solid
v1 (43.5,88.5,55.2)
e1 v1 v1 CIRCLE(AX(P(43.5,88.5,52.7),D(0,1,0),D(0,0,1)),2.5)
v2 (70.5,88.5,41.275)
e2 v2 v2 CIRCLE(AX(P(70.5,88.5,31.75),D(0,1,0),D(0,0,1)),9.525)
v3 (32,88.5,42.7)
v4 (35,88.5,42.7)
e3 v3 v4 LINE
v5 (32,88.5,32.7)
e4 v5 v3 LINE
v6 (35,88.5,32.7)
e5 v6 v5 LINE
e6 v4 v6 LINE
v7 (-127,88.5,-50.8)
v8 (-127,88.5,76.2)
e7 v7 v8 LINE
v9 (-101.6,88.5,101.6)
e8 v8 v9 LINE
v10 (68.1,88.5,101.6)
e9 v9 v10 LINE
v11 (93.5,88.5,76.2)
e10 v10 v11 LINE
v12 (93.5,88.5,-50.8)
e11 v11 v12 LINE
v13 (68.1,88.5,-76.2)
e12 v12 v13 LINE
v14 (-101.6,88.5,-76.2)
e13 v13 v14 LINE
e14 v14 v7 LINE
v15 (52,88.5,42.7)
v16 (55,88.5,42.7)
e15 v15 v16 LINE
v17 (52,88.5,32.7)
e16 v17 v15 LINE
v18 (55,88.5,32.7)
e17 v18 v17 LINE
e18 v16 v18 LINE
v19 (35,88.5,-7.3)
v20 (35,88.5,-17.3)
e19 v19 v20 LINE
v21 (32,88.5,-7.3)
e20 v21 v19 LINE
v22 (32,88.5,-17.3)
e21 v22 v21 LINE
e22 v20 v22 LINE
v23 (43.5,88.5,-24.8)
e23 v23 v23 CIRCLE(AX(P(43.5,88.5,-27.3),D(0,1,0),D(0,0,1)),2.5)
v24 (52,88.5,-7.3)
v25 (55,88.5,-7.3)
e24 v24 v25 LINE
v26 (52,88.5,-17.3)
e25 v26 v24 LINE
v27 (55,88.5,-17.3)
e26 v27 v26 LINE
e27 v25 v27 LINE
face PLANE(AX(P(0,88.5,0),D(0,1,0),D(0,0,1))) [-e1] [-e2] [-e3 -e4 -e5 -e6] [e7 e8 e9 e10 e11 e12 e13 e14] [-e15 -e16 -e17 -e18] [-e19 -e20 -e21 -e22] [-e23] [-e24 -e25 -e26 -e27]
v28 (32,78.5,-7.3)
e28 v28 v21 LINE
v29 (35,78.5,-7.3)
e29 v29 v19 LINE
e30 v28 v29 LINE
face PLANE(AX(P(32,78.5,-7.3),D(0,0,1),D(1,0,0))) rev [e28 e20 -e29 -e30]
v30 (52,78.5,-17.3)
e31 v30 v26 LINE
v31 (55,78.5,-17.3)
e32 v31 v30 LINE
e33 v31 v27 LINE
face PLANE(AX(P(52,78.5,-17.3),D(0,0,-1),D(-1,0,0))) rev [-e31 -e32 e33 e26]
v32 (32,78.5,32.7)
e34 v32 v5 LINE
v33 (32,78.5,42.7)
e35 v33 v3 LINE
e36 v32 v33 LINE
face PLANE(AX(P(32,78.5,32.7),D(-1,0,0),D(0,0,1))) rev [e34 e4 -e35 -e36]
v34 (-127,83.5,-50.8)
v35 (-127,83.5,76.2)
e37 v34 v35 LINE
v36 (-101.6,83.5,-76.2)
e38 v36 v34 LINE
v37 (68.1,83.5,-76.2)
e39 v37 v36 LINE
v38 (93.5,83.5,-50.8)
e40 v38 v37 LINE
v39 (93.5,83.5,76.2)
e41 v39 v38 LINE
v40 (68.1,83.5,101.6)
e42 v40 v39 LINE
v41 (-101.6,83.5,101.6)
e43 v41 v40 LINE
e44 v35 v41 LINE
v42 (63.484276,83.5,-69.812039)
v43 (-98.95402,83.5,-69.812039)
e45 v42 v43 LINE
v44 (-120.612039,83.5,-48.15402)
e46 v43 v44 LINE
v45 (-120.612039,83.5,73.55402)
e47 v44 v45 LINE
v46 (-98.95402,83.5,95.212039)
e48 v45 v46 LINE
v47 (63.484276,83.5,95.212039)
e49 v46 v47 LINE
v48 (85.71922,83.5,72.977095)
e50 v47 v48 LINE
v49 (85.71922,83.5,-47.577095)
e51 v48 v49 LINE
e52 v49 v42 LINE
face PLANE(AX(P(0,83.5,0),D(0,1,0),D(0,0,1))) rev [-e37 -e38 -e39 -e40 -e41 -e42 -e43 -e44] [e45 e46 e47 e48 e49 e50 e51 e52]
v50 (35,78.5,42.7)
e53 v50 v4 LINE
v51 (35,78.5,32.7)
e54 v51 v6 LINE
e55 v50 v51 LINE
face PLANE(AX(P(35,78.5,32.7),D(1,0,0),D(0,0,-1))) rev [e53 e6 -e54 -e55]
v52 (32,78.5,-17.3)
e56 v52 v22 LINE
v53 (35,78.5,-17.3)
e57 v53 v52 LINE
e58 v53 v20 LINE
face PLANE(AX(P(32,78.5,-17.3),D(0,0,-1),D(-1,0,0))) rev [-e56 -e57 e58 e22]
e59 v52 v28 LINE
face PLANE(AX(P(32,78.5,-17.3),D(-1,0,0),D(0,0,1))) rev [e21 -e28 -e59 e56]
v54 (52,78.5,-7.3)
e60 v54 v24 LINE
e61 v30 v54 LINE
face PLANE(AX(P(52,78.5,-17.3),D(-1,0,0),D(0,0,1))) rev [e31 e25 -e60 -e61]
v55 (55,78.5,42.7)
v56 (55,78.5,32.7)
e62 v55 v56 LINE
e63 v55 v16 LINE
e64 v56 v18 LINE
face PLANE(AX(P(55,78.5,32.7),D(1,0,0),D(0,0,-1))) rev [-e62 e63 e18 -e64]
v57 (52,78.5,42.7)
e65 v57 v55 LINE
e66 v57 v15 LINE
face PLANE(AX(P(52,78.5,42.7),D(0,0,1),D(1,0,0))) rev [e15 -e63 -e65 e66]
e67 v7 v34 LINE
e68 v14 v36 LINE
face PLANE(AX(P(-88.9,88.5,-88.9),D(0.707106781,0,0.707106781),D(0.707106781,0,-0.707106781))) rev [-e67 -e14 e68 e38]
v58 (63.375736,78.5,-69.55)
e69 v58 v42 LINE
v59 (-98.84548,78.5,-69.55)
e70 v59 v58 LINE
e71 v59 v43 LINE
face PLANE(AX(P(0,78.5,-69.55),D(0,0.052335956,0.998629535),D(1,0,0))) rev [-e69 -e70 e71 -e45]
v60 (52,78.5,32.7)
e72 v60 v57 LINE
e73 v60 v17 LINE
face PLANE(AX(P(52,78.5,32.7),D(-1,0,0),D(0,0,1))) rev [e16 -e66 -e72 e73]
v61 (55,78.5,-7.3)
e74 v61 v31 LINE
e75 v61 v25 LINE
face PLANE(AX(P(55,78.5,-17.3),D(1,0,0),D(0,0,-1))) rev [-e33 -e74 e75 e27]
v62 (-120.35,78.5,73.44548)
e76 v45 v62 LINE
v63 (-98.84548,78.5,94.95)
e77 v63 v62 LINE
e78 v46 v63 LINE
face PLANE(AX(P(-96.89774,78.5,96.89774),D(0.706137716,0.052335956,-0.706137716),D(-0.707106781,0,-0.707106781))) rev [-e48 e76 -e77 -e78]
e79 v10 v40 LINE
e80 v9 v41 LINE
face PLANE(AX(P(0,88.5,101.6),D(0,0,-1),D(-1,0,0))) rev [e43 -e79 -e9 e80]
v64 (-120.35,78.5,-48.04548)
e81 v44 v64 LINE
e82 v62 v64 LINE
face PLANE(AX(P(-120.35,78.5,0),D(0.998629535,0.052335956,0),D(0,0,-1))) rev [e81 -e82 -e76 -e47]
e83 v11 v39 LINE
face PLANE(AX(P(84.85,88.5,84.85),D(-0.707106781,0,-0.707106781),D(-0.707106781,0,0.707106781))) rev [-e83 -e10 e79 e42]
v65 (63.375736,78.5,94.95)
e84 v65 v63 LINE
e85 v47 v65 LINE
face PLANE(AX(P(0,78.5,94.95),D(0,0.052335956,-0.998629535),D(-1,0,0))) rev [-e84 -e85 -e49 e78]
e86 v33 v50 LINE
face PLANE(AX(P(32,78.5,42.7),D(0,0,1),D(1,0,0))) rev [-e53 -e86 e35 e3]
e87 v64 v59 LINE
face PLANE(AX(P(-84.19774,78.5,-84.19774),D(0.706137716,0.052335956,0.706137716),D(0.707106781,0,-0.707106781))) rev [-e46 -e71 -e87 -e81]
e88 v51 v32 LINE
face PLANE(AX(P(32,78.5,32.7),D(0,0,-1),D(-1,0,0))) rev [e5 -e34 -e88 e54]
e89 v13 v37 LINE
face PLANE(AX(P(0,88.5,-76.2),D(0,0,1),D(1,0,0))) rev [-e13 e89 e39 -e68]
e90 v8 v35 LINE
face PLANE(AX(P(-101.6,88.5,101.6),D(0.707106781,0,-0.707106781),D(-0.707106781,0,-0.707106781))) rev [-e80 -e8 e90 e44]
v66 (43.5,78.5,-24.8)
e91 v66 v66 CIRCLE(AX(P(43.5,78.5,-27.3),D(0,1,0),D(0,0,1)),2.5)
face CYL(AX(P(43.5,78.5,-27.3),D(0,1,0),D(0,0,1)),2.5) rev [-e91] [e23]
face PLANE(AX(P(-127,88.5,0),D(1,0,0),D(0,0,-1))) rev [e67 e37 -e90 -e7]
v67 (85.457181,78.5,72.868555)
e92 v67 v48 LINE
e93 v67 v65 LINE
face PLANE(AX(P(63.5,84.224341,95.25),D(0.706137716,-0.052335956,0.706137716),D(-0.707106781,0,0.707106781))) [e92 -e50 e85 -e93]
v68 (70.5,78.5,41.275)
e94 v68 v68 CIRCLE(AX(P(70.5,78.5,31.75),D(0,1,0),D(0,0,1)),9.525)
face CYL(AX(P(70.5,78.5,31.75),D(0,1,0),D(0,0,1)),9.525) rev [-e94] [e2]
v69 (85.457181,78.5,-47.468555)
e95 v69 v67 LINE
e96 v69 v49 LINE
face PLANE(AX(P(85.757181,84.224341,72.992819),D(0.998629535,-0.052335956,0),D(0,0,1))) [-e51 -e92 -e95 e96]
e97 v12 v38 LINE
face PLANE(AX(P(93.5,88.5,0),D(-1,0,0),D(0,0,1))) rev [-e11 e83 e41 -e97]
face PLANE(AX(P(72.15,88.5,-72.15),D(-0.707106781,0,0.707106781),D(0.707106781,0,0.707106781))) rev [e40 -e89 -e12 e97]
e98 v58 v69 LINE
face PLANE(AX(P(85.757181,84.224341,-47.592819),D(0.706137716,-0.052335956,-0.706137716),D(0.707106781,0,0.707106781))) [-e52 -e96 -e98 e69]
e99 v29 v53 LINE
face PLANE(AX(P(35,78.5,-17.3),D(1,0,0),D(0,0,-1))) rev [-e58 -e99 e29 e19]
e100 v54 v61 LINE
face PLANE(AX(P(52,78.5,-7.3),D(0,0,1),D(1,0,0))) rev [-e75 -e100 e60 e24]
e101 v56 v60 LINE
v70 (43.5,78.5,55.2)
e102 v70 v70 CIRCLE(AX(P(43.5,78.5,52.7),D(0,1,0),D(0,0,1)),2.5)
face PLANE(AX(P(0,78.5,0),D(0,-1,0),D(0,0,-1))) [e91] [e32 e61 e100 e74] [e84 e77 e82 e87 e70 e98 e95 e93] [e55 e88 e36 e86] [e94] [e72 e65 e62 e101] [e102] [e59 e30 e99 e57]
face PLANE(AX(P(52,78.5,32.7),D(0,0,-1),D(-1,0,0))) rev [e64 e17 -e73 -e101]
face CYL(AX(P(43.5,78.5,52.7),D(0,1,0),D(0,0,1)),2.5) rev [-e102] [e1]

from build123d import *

# Parameters (mm, degrees)
SKETCH2_W               = 190.5
SKETCH2_H               = 177.8
BOSS_EXTRUDE1_DEPTH     = 5.08
CHAMFER1_SIZE           = 25.4
BOSS_EXTRUDE3_DEPTH     = 68.42
SKETCH5_R               = 9
SKETCH5_R_2             = 1.5
CUT_EXTRUDE1_DEPTH      = 231.530019737
SKETCH10_W              = 177.8
SKETCH10_H              = 73.5
BOSS_EXTRUDE6_DEPTH     = 30
CHAMFER3_SIZE           = 25.4
CUT_EXTRUDE2_DEPTH      = 68.42
BOSS_EXTRUDE7_START     = 38.1
BOSS_EXTRUDE7_DEPTH     = 10
SKETCH13_W              = 15.24
SKETCH13_H              = 10
BOSS_EXTRUDE8_DEPTH     = 7
SKETCH14_R              = 2.5
CUT_EXTRUDE3_DEPTH      = 10
MIRROR4_COPY_1_SKETCH_W = 15.24
MIRROR4_COPY_1_SKETCH_H = 10
MIRROR4_COPY_1_DEPTH    = 7
MIRROR4_COPY_2_SKETCH_R = 2.5
MIRROR4_COPY_2_DEPTH    = 10
BOSS_EXTRUDE9_START     = 5
BOSS_EXTRUDE9_DEPTH     = 5
BOSS_EXTRUDE10_START    = 10
BOSS_EXTRUDE10_DEPTH    = 5
SKETCH16_R              = 2.5
CUT_EXTRUDE4_DEPTH      = 163.946494286
SKETCH17_W              = 3
SKETCH17_H              = 10
CUT_EXTRUDE5_DEPTH      = 163.946494286
BOSS_EXTRUDE11_START    = 10
SKETCH18_W              = 3
SKETCH18_H              = 10
BOSS_EXTRUDE11_DEPTH    = 10
BOSS_EXTRUDE11_2_DEPTH  = 10
BOSS_EXTRUDE11_3_DEPTH  = 10
BOSS_EXTRUDE11_4_DEPTH  = 10
SKETCH19_W              = 23
SKETCH19_H              = 60
BOSS_EXTRUDE12_DEPTH    = 20
CHAMFER5_SIZE           = 5.724341006
CHAMFER5_SIZE_2         = 0.3
BOSS_EXTRUDE13_START    = -20
SKETCH20_R              = 2.5
BOSS_EXTRUDE13_DEPTH    = 4
SKETCH21_R              = 9.525
CUT_EXTRUDE6_DEPTH      = 10


with BuildPart() as part:
    # Sketch2 → Boss-Extrude1 (new body)
    with BuildSketch(Plane(origin=(0, 0, 0), x_dir=(1, 0, 0), z_dir=(0, 1, 0))):
        with Locations((-31.75, -12.7)):
            Rectangle(SKETCH2_W, SKETCH2_H)
    extrude(amount=BOSS_EXTRUDE1_DEPTH)

    # Chamfer1
    chamfer1_edges = [part.edges().sort_by_distance(p)[0] for p in [
        (-127, 2.54, -76.2),
        (-127, 2.54, 101.6),
    ]]
    chamfer(chamfer1_edges, length=CHAMFER1_SIZE)

    # Sketch4 → Boss-Extrude3 (add)
    with BuildSketch(Plane(origin=(0, 5.08, 0), x_dir=(1, 0, 0), z_dir=(0, 1, 0))):
        Polygon((57.15, 69.85), (-98.969743879, 69.85), (-120.65, 48.169743879), (-120.65, -73.569743879), (-98.969743879, -95.25), (57.15, -95.25), (63.5, -95.25), (63.5, -101.6), (-101.6, -101.6), (-127, -76.2), (-127, 50.8), (-101.6, 76.2), (63.5, 76.2), (63.5, 69.85), align=None)
    extrude(amount=BOSS_EXTRUDE3_DEPTH)

    # Sketch5 → Cut-Extrude1 (cut, through all)
    with BuildSketch(Plane.XY.offset(101.6)):
        with Locations((-50.8, 31.75)):
            Circle(SKETCH5_R)
        with Locations((-50.8, 47.25)):
            Circle(SKETCH5_R_2)
        with Locations((-37.376606241, 39.5)):
            Circle(SKETCH5_R_2)
        with Locations((-37.376606241, 24)):
            Circle(SKETCH5_R_2)
        with Locations((-50.8, 16.25)):
            Circle(SKETCH5_R_2)
        with Locations((-64.223393759, 24)):
            Circle(SKETCH5_R_2)
        with Locations((-64.223393759, 39.5)):
            Circle(SKETCH5_R_2)
    extrude(amount=-CUT_EXTRUDE1_DEPTH, mode=Mode.SUBTRACT)

    # Sketch10 → Boss-Extrude6 (add)
    with BuildSketch(Plane(origin=(63.5, 0, 0), x_dir=(0, 0, -1), z_dir=(1, 0, 0))):
        with Locations((-12.7, 36.75)):
            Rectangle(SKETCH10_W, SKETCH10_H)
    extrude(amount=BOSS_EXTRUDE6_DEPTH)

    # Chamfer3
    chamfer3_edges = [part.edges().sort_by_distance(p)[0] for p in [
        (93.5, 36.75, 101.6),
        (93.5, 36.75, -76.2),
    ]]
    chamfer(chamfer3_edges, length=CHAMFER3_SIZE)

    # Sketch11 → Cut-Extrude2 (cut)
    with BuildSketch(Plane(origin=(0, 73.5, 0), x_dir=(1, 0, 0), z_dir=(0, 1, 0))):
        Polygon((85.757180746, -72.992819254), (85.757180746, 47.592819254), (63.5, 69.85), (63.5, -95.25), align=None)
    extrude(amount=-CUT_EXTRUDE2_DEPTH, mode=Mode.SUBTRACT)

    # Sketch12 → Boss-Extrude7 (add)
    with BuildSketch(Plane(origin=(0, 0, 95.25), x_dir=(-1, 0, 0), z_dir=(0, 0, -1)).offset(BOSS_EXTRUDE7_START)):
        with BuildLine():
            Line((25.8, 5.08), (75.8, 5.08))
            Line((75.8, 5.08), (75.8, 31.75))
            Line((75.8, 31.75), (69.8, 31.75))
            ThreePointArc((69.8, 31.75), (50.8, 12.75), (31.8, 31.75))
            Line((31.8, 31.75), (25.8, 31.75))
            Line((25.8, 31.75), (25.8, 5.08))
        make_face()
    boss_extrude7 = extrude(amount=BOSS_EXTRUDE7_DEPTH)

    # Sketch13 → Boss-Extrude8 (add)
    with BuildSketch(Plane(origin=(0, 31.75, 0), x_dir=(1, 0, 0), z_dir=(0, 1, 0))):
        with Locations((-24.18, -52.15)):
            Rectangle(SKETCH13_W, SKETCH13_H)
    boss_extrude8 = extrude(amount=-BOSS_EXTRUDE8_DEPTH)

    # Sketch14 → Cut-Extrude3 (cut)
    with BuildSketch(Plane(origin=(0, 31.75, 0), x_dir=(1, 0, 0), z_dir=(0, 1, 0))):
        with Locations(Location((-20.37, -52.15, 0), (0, 0, 270))):
            Circle(SKETCH14_R)
    cut_extrude3 = extrude(amount=-CUT_EXTRUDE3_DEPTH, mode=Mode.SUBTRACT)

    # Mirror2: Boss-Extrude8 across plane
    add(boss_extrude8.mirror(Plane.ZY.offset(50.8)))

    # Mirror3: Cut-Extrude3 across plane
    add(cut_extrude3.mirror(Plane.ZY.offset(50.8)), mode=Mode.SUBTRACT)

    # Mirror4: Boss-Extrude7, Boss-Extrude8, Cut-Extrude3 across plane
    add(boss_extrude7.mirror(Plane.XY.offset(12.7)))
    add(boss_extrude8.mirror(Plane.XY.offset(12.7)))
    add(cut_extrude3.mirror(Plane.XY.offset(12.7)), mode=Mode.SUBTRACT)

    # Mirror4 copy 1 sketch → Mirror4 copy 1 (add)
    with BuildSketch(Plane(origin=(-101.6, 31.75, 25.4), x_dir=(-1, 0, 0), z_dir=(0, 1, 0))):
        with Locations((-24.18, -52.15)):
            Rectangle(MIRROR4_COPY_1_SKETCH_W, MIRROR4_COPY_1_SKETCH_H)
    extrude(amount=-MIRROR4_COPY_1_DEPTH)

    # Mirror4 copy 2 sketch → Mirror4 copy 2 (cut)
    with BuildSketch(Plane(origin=(-101.6, 31.75, 25.4), x_dir=(-1, 0, 0), z_dir=(0, 1, 0))):
        with Locations(Location((-20.37, -52.15, 0), (0, 0, 270))):
            Circle(MIRROR4_COPY_2_SKETCH_R)
    extrude(amount=-MIRROR4_COPY_2_DEPTH, mode=Mode.SUBTRACT)


with BuildPart() as body_2:
    # Sketch15 → Boss-Extrude9 (new body)
    with BuildSketch(Plane(origin=(0, 73.5, 0), x_dir=(1, 0, 0), z_dir=(0, 1, 0)).offset(BOSS_EXTRUDE9_START)):
        Polygon((85.757180746, 47.592819254), (63.5, 69.85), (-98.969743879, 69.85), (-120.65, 48.169743879), (-120.65, -73.569743879), (-98.969743879, -95.25), (63.5, -95.25), (85.757180746, -72.992819254), align=None)
    extrude(amount=BOSS_EXTRUDE9_DEPTH)

    # Sketch15<3> → Boss-Extrude10 (add)
    with BuildSketch(Plane(origin=(0, 73.5, 0), x_dir=(1, 0, 0), z_dir=(0, 1, 0)).offset(BOSS_EXTRUDE10_START)):
        Polygon((68.1, -101.6), (93.5, -76.2), (93.5, 50.8), (68.1, 76.2), (-101.6, 76.2), (-127, 50.8), (-127, -76.2), (-101.6, -101.6), align=None)
    extrude(amount=BOSS_EXTRUDE10_DEPTH)

    # Sketch16 → Cut-Extrude4 (cut, through all)
    with BuildSketch(Plane(origin=(0, 88.5, 0), x_dir=(1, 0, 0), z_dir=(0, 1, 0))):
        with Locations(Location((43.5, 27.3, 0), (0, 0, 270))):
            Circle(SKETCH16_R)
        with Locations(Location((43.5, -52.7, 0), (0, 0, 270))):
            Circle(SKETCH16_R)
    extrude(amount=-CUT_EXTRUDE4_DEPTH, mode=Mode.SUBTRACT)

    # Sketch17 → Cut-Extrude5 (cut, through all)
    with BuildSketch(Plane(origin=(0, 88.5, 0), x_dir=(1, 0, 0), z_dir=(0, 1, 0))):
        with Locations((33.5, 12.3)):
            Rectangle(SKETCH17_W, SKETCH17_H)
        with Locations((53.5, 12.3)):
            Rectangle(SKETCH17_W, SKETCH17_H)
        with Locations((33.5, -37.7)):
            Rectangle(SKETCH17_W, SKETCH17_H)
        with Locations((53.5, -37.7)):
            Rectangle(SKETCH17_W, SKETCH17_H)
    extrude(amount=-CUT_EXTRUDE5_DEPTH, mode=Mode.SUBTRACT)

    # Chamfer5
    # the kernel refuses this chamfer: 5.724341006, 0.3 mm, written as the material it takes off along each edge
    with BuildSketch(Plane(origin=(52.976460511, 78.5, 105.773539489), x_dir=(0.0014234225126538123, 0.999997973866298, 0.0014234225126538165), z_dir=(0.7071067811865485, 0, -0.7071067811865466))) as chamfer5_piece_1_section:
        Polygon((CHAMFER5_SIZE * 0.999997973922, -CHAMFER5_SIZE * 0.00201302342249), (-CHAMFER5_SIZE_2 * 0.00201302342238, -CHAMFER5_SIZE_2 * 0.999997973866), (0, 0), align=None)
    chamfer5_piece_1 = extrude(amount=61.24147141, mode=Mode.PRIVATE)
    chamfer5_piece_1 = split(chamfer5_piece_1, bisect_by=Plane(origin=(74.599777389, 83.5, 84.092596643), z_dir=(0, -1, 0)), keep=Keep.TOP, mode=Mode.PRIVATE)
    add(chamfer5_piece_1, mode=Mode.SUBTRACT)
    with BuildSketch(Plane(origin=(-113.852276148, 78.5, 95.25), x_dir=(0, 0.999997973866298, 0.002013023422382438), z_dir=(1, 0, 0))) as chamfer5_piece_2_section:
        Polygon((CHAMFER5_SIZE * 0.999997973922, -CHAMFER5_SIZE * 0.00201302342249), (-CHAMFER5_SIZE_2 * 0.00201302342238, -CHAMFER5_SIZE_2 * 0.999997973866), (0, 0), align=None)
    chamfer5_piece_2 = extrude(amount=192.234808418, mode=Mode.PRIVATE)
    chamfer5_piece_2 = split(chamfer5_piece_2, bisect_by=Plane(origin=(-17.734871939, 83.5, 95.209252287), z_dir=(0, -1, 0)), keep=Keep.TOP, mode=Mode.PRIVATE)
    add(chamfer5_piece_2, mode=Mode.SUBTRACT)
    with BuildSketch(Plane(origin=(-131.173539489, 78.5, 63.04620439), x_dir=(-0.0014234225126544158, 0.999997973866298, 0.0014234225126544065), z_dir=(0.7071067811865452, 0, 0.7071067811865498))) as chamfer5_piece_3_section:
        Polygon((CHAMFER5_SIZE * 0.999997973922, -CHAMFER5_SIZE * 0.00201302342249), (-CHAMFER5_SIZE_2 * 0.00201302342238, -CHAMFER5_SIZE_2 * 0.999997973866), (0, 0), align=None)
    chamfer5_piece_3 = extrude(amount=60.425576781, mode=Mode.PRIVATE)
    chamfer5_piece_3 = split(chamfer5_piece_3, bisect_by=Plane(origin=(-109.781058955, 83.5, 84.381058955), z_dir=(0, -1, 0)), keep=Keep.TOP, mode=Mode.PRIVATE)
    add(chamfer5_piece_3, mode=Mode.SUBTRACT)
    with BuildSketch(Plane(origin=(-120.65, 78.5, -63.052276148), x_dir=(-0.002013023422382438, 0.999997973866298, 0), z_dir=(0, 0, 1))) as chamfer5_piece_4_section:
        Polygon((CHAMFER5_SIZE * 0.999997973922, -CHAMFER5_SIZE * 0.00201302342249), (-CHAMFER5_SIZE_2 * 0.00201302342238, -CHAMFER5_SIZE_2 * 0.999997973866), (0, 0), align=None)
    chamfer5_piece_4 = extrude(amount=151.504552297, mode=Mode.PRIVATE)
    chamfer5_piece_4 = split(chamfer5_piece_4, bisect_by=Plane(origin=(-120.609252287, 83.5, 12.7), z_dir=(0, -1, 0)), keep=Keep.TOP, mode=Mode.PRIVATE)
    add(chamfer5_piece_4, mode=Mode.SUBTRACT)
    with BuildSketch(Plane(origin=(-88.44620439, 78.5, -80.373539489), x_dir=(-0.001423422512653215, 0.999997973866298, -0.0014234225126532204), z_dir=(-0.7071067811865488, 0, 0.7071067811865462))) as chamfer5_piece_5_section:
        Polygon((CHAMFER5_SIZE * 0.999997973922, -CHAMFER5_SIZE * 0.0020130234225), (-CHAMFER5_SIZE_2 * 0.00201302342238, -CHAMFER5_SIZE_2 * 0.999997973866), (0, 0), align=None)
    chamfer5_piece_5 = extrude(amount=60.425576781, mode=Mode.PRIVATE)
    chamfer5_piece_5 = split(chamfer5_piece_5, bisect_by=Plane(origin=(-109.781058955, 83.5, -58.981058955), z_dir=(0, -1, 0)), keep=Keep.TOP, mode=Mode.PRIVATE)
    add(chamfer5_piece_5, mode=Mode.SUBTRACT)
    with BuildSketch(Plane(origin=(78.382532269, 78.5, -69.85), x_dir=(0, 0.999997973866298, -0.002013023422382438), z_dir=(-1, 0, 0))) as chamfer5_piece_6_section:
        Polygon((CHAMFER5_SIZE * 0.999997973922, -CHAMFER5_SIZE * 0.00201302342249), (-CHAMFER5_SIZE_2 * 0.00201302342238, -CHAMFER5_SIZE_2 * 0.999997973866), (0, 0), align=None)
    chamfer5_piece_6 = extrude(amount=192.234808418, mode=Mode.PRIVATE)
    chamfer5_piece_6 = split(chamfer5_piece_6, bisect_by=Plane(origin=(-17.734871939, 83.5, -69.809252287), z_dir=(0, -1, 0)), keep=Keep.TOP, mode=Mode.PRIVATE)
    add(chamfer5_piece_6, mode=Mode.SUBTRACT)
    with BuildSketch(Plane(origin=(96.280720235, 78.5, -37.069279765), x_dir=(0.0014234225126538128, 0.999997973866298, -0.0014234225126538162), z_dir=(-0.7071067811865483, 0, -0.7071067811865467))) as chamfer5_piece_7_section:
        Polygon((CHAMFER5_SIZE * 0.999997973922, -CHAMFER5_SIZE * 0.00201302342249), (-CHAMFER5_SIZE_2 * 0.00201302342238, -CHAMFER5_SIZE_2 * 0.999997973866), (0, 0), align=None)
    chamfer5_piece_7 = extrude(amount=61.24147141, mode=Mode.PRIVATE)
    chamfer5_piece_7 = split(chamfer5_piece_7, bisect_by=Plane(origin=(74.599777389, 83.5, -58.692596643), z_dir=(0, -1, 0)), keep=Keep.TOP, mode=Mode.PRIVATE)
    add(chamfer5_piece_7, mode=Mode.SUBTRACT)
    with BuildSketch(Plane(origin=(85.757180746, 78.5, 87.875351523), x_dir=(0.002013023422382438, 0.999997973866298, 0), z_dir=(0, 0, -1))) as chamfer5_piece_8_section:
        Polygon((CHAMFER5_SIZE * 0.999997973922, -CHAMFER5_SIZE * 0.00201302342249), (-CHAMFER5_SIZE_2 * 0.00201302342238, -CHAMFER5_SIZE_2 * 0.999997973866), (0, 0), align=None)
    chamfer5_piece_8 = extrude(amount=150.350703047, mode=Mode.PRIVATE)
    chamfer5_piece_8 = split(chamfer5_piece_8, bisect_by=Plane(origin=(85.716433033, 83.5, 12.7), z_dir=(0, -1, 0)), keep=Keep.TOP, mode=Mode.PRIVATE)
    add(chamfer5_piece_8, mode=Mode.SUBTRACT)

    # Sketch21 → Cut-Extrude6 (cut)
    with BuildSketch(Plane(origin=(0, 88.5, 0), x_dir=(1, 0, 0), z_dir=(0, 1, 0))):
        with Locations(Location((70.5, -31.75, 0), (0, 0, 270))):
            Circle(SKETCH21_R)
    extrude(amount=-CUT_EXTRUDE6_DEPTH, mode=Mode.SUBTRACT)


with BuildPart() as body_2_2:
    # Sketch18 → Boss-Extrude11 (new body)
    with BuildSketch(Plane(origin=(0, 88.5, 0), x_dir=(1, 0, 0), z_dir=(0, 1, 0)).offset(BOSS_EXTRUDE11_START)):
        with Locations((53.5, -37.7)):
            Rectangle(SKETCH18_W, SKETCH18_H)
    extrude(amount=BOSS_EXTRUDE11_DEPTH)



with BuildPart() as body_3:
    # Sketch18 → Boss-Extrude11 2 (new body)
    with BuildSketch(Plane(origin=(0, 88.5, 0), x_dir=(1, 0, 0), z_dir=(0, 1, 0)).offset(BOSS_EXTRUDE11_START)):
        with Locations((33.5, -37.7)):
            Rectangle(SKETCH18_W, SKETCH18_H)
    extrude(amount=BOSS_EXTRUDE11_2_DEPTH)


with BuildPart() as body_4:
    # Sketch18 → Boss-Extrude11 3 (new body)
    with BuildSketch(Plane(origin=(0, 88.5, 0), x_dir=(1, 0, 0), z_dir=(0, 1, 0)).offset(BOSS_EXTRUDE11_START)):
        with Locations((33.5, 12.3)):
            Rectangle(SKETCH18_W, SKETCH18_H)
    extrude(amount=BOSS_EXTRUDE11_3_DEPTH)


with BuildPart() as body_5:
    # Sketch18 → Boss-Extrude11 4 (new body)
    with BuildSketch(Plane(origin=(0, 88.5, 0), x_dir=(1, 0, 0), z_dir=(0, 1, 0)).offset(BOSS_EXTRUDE11_START)):
        with Locations((53.5, 12.3)):
            Rectangle(SKETCH18_W, SKETCH18_H)
    extrude(amount=BOSS_EXTRUDE11_4_DEPTH)


with BuildPart() as body_2_2_1:
    add(body_2_2.part)

    add(body_3.part)  # Boss-Extrude12 merges body 3

    add(body_4.part)  # Boss-Extrude12 merges body 4

    add(body_5.part)  # Boss-Extrude12 merges body 5
    # Sketch19 → Boss-Extrude12 (add)
    with BuildSketch(Plane(origin=(0, 108.5, 0), x_dir=(1, 0, 0), z_dir=(0, 1, 0))):
        with Locations((43.5, -12.7)):
            Rectangle(SKETCH19_W, SKETCH19_H)
    extrude(amount=BOSS_EXTRUDE12_DEPTH)

    # Sketch20 → Boss-Extrude13 (add)
    # profile 1 of 2: a face of its own
    with BuildSketch(Plane(origin=(0, 128.5, 0), x_dir=(1, 0, 0), z_dir=(0, 1, 0)).offset(BOSS_EXTRUDE13_START)):
        with BuildLine():
            Line((32, 17.3), (39.162824532, 29.787751788))
            ThreePointArc((39.162824532, 29.787751788), (43.5, 32.3), (47.837175468, 29.787751788))
            Line((47.837175468, 29.787751788), (55, 17.3))
            Line((55, 17.3), (32, 17.3))
        make_face()
        with Locations(Location((43.5, 27.3, 0), (0, 0, 270))):
            Circle(SKETCH20_R, mode=Mode.SUBTRACT)
    # profile 2 of 2: a face of its own
    with BuildSketch(Plane(origin=(0, 128.5, 0), x_dir=(1, 0, 0), z_dir=(0, 1, 0)).offset(BOSS_EXTRUDE13_START)):
        with BuildLine():
            Line((55, -42.7), (47.837175468, -55.187751788))
            ThreePointArc((47.837175468, -55.187751788), (43.5, -57.7), (39.162824532, -55.187751788))
            Line((39.162824532, -55.187751788), (32, -42.7))
            Line((32, -42.7), (55, -42.7))
        make_face()
        with Locations(Location((43.5, -52.7, 0), (0, 0, 270))):
            Circle(SKETCH20_R, mode=Mode.SUBTRACT)
    extrude(amount=BOSS_EXTRUDE13_DEPTH)


solid = body_2.part
